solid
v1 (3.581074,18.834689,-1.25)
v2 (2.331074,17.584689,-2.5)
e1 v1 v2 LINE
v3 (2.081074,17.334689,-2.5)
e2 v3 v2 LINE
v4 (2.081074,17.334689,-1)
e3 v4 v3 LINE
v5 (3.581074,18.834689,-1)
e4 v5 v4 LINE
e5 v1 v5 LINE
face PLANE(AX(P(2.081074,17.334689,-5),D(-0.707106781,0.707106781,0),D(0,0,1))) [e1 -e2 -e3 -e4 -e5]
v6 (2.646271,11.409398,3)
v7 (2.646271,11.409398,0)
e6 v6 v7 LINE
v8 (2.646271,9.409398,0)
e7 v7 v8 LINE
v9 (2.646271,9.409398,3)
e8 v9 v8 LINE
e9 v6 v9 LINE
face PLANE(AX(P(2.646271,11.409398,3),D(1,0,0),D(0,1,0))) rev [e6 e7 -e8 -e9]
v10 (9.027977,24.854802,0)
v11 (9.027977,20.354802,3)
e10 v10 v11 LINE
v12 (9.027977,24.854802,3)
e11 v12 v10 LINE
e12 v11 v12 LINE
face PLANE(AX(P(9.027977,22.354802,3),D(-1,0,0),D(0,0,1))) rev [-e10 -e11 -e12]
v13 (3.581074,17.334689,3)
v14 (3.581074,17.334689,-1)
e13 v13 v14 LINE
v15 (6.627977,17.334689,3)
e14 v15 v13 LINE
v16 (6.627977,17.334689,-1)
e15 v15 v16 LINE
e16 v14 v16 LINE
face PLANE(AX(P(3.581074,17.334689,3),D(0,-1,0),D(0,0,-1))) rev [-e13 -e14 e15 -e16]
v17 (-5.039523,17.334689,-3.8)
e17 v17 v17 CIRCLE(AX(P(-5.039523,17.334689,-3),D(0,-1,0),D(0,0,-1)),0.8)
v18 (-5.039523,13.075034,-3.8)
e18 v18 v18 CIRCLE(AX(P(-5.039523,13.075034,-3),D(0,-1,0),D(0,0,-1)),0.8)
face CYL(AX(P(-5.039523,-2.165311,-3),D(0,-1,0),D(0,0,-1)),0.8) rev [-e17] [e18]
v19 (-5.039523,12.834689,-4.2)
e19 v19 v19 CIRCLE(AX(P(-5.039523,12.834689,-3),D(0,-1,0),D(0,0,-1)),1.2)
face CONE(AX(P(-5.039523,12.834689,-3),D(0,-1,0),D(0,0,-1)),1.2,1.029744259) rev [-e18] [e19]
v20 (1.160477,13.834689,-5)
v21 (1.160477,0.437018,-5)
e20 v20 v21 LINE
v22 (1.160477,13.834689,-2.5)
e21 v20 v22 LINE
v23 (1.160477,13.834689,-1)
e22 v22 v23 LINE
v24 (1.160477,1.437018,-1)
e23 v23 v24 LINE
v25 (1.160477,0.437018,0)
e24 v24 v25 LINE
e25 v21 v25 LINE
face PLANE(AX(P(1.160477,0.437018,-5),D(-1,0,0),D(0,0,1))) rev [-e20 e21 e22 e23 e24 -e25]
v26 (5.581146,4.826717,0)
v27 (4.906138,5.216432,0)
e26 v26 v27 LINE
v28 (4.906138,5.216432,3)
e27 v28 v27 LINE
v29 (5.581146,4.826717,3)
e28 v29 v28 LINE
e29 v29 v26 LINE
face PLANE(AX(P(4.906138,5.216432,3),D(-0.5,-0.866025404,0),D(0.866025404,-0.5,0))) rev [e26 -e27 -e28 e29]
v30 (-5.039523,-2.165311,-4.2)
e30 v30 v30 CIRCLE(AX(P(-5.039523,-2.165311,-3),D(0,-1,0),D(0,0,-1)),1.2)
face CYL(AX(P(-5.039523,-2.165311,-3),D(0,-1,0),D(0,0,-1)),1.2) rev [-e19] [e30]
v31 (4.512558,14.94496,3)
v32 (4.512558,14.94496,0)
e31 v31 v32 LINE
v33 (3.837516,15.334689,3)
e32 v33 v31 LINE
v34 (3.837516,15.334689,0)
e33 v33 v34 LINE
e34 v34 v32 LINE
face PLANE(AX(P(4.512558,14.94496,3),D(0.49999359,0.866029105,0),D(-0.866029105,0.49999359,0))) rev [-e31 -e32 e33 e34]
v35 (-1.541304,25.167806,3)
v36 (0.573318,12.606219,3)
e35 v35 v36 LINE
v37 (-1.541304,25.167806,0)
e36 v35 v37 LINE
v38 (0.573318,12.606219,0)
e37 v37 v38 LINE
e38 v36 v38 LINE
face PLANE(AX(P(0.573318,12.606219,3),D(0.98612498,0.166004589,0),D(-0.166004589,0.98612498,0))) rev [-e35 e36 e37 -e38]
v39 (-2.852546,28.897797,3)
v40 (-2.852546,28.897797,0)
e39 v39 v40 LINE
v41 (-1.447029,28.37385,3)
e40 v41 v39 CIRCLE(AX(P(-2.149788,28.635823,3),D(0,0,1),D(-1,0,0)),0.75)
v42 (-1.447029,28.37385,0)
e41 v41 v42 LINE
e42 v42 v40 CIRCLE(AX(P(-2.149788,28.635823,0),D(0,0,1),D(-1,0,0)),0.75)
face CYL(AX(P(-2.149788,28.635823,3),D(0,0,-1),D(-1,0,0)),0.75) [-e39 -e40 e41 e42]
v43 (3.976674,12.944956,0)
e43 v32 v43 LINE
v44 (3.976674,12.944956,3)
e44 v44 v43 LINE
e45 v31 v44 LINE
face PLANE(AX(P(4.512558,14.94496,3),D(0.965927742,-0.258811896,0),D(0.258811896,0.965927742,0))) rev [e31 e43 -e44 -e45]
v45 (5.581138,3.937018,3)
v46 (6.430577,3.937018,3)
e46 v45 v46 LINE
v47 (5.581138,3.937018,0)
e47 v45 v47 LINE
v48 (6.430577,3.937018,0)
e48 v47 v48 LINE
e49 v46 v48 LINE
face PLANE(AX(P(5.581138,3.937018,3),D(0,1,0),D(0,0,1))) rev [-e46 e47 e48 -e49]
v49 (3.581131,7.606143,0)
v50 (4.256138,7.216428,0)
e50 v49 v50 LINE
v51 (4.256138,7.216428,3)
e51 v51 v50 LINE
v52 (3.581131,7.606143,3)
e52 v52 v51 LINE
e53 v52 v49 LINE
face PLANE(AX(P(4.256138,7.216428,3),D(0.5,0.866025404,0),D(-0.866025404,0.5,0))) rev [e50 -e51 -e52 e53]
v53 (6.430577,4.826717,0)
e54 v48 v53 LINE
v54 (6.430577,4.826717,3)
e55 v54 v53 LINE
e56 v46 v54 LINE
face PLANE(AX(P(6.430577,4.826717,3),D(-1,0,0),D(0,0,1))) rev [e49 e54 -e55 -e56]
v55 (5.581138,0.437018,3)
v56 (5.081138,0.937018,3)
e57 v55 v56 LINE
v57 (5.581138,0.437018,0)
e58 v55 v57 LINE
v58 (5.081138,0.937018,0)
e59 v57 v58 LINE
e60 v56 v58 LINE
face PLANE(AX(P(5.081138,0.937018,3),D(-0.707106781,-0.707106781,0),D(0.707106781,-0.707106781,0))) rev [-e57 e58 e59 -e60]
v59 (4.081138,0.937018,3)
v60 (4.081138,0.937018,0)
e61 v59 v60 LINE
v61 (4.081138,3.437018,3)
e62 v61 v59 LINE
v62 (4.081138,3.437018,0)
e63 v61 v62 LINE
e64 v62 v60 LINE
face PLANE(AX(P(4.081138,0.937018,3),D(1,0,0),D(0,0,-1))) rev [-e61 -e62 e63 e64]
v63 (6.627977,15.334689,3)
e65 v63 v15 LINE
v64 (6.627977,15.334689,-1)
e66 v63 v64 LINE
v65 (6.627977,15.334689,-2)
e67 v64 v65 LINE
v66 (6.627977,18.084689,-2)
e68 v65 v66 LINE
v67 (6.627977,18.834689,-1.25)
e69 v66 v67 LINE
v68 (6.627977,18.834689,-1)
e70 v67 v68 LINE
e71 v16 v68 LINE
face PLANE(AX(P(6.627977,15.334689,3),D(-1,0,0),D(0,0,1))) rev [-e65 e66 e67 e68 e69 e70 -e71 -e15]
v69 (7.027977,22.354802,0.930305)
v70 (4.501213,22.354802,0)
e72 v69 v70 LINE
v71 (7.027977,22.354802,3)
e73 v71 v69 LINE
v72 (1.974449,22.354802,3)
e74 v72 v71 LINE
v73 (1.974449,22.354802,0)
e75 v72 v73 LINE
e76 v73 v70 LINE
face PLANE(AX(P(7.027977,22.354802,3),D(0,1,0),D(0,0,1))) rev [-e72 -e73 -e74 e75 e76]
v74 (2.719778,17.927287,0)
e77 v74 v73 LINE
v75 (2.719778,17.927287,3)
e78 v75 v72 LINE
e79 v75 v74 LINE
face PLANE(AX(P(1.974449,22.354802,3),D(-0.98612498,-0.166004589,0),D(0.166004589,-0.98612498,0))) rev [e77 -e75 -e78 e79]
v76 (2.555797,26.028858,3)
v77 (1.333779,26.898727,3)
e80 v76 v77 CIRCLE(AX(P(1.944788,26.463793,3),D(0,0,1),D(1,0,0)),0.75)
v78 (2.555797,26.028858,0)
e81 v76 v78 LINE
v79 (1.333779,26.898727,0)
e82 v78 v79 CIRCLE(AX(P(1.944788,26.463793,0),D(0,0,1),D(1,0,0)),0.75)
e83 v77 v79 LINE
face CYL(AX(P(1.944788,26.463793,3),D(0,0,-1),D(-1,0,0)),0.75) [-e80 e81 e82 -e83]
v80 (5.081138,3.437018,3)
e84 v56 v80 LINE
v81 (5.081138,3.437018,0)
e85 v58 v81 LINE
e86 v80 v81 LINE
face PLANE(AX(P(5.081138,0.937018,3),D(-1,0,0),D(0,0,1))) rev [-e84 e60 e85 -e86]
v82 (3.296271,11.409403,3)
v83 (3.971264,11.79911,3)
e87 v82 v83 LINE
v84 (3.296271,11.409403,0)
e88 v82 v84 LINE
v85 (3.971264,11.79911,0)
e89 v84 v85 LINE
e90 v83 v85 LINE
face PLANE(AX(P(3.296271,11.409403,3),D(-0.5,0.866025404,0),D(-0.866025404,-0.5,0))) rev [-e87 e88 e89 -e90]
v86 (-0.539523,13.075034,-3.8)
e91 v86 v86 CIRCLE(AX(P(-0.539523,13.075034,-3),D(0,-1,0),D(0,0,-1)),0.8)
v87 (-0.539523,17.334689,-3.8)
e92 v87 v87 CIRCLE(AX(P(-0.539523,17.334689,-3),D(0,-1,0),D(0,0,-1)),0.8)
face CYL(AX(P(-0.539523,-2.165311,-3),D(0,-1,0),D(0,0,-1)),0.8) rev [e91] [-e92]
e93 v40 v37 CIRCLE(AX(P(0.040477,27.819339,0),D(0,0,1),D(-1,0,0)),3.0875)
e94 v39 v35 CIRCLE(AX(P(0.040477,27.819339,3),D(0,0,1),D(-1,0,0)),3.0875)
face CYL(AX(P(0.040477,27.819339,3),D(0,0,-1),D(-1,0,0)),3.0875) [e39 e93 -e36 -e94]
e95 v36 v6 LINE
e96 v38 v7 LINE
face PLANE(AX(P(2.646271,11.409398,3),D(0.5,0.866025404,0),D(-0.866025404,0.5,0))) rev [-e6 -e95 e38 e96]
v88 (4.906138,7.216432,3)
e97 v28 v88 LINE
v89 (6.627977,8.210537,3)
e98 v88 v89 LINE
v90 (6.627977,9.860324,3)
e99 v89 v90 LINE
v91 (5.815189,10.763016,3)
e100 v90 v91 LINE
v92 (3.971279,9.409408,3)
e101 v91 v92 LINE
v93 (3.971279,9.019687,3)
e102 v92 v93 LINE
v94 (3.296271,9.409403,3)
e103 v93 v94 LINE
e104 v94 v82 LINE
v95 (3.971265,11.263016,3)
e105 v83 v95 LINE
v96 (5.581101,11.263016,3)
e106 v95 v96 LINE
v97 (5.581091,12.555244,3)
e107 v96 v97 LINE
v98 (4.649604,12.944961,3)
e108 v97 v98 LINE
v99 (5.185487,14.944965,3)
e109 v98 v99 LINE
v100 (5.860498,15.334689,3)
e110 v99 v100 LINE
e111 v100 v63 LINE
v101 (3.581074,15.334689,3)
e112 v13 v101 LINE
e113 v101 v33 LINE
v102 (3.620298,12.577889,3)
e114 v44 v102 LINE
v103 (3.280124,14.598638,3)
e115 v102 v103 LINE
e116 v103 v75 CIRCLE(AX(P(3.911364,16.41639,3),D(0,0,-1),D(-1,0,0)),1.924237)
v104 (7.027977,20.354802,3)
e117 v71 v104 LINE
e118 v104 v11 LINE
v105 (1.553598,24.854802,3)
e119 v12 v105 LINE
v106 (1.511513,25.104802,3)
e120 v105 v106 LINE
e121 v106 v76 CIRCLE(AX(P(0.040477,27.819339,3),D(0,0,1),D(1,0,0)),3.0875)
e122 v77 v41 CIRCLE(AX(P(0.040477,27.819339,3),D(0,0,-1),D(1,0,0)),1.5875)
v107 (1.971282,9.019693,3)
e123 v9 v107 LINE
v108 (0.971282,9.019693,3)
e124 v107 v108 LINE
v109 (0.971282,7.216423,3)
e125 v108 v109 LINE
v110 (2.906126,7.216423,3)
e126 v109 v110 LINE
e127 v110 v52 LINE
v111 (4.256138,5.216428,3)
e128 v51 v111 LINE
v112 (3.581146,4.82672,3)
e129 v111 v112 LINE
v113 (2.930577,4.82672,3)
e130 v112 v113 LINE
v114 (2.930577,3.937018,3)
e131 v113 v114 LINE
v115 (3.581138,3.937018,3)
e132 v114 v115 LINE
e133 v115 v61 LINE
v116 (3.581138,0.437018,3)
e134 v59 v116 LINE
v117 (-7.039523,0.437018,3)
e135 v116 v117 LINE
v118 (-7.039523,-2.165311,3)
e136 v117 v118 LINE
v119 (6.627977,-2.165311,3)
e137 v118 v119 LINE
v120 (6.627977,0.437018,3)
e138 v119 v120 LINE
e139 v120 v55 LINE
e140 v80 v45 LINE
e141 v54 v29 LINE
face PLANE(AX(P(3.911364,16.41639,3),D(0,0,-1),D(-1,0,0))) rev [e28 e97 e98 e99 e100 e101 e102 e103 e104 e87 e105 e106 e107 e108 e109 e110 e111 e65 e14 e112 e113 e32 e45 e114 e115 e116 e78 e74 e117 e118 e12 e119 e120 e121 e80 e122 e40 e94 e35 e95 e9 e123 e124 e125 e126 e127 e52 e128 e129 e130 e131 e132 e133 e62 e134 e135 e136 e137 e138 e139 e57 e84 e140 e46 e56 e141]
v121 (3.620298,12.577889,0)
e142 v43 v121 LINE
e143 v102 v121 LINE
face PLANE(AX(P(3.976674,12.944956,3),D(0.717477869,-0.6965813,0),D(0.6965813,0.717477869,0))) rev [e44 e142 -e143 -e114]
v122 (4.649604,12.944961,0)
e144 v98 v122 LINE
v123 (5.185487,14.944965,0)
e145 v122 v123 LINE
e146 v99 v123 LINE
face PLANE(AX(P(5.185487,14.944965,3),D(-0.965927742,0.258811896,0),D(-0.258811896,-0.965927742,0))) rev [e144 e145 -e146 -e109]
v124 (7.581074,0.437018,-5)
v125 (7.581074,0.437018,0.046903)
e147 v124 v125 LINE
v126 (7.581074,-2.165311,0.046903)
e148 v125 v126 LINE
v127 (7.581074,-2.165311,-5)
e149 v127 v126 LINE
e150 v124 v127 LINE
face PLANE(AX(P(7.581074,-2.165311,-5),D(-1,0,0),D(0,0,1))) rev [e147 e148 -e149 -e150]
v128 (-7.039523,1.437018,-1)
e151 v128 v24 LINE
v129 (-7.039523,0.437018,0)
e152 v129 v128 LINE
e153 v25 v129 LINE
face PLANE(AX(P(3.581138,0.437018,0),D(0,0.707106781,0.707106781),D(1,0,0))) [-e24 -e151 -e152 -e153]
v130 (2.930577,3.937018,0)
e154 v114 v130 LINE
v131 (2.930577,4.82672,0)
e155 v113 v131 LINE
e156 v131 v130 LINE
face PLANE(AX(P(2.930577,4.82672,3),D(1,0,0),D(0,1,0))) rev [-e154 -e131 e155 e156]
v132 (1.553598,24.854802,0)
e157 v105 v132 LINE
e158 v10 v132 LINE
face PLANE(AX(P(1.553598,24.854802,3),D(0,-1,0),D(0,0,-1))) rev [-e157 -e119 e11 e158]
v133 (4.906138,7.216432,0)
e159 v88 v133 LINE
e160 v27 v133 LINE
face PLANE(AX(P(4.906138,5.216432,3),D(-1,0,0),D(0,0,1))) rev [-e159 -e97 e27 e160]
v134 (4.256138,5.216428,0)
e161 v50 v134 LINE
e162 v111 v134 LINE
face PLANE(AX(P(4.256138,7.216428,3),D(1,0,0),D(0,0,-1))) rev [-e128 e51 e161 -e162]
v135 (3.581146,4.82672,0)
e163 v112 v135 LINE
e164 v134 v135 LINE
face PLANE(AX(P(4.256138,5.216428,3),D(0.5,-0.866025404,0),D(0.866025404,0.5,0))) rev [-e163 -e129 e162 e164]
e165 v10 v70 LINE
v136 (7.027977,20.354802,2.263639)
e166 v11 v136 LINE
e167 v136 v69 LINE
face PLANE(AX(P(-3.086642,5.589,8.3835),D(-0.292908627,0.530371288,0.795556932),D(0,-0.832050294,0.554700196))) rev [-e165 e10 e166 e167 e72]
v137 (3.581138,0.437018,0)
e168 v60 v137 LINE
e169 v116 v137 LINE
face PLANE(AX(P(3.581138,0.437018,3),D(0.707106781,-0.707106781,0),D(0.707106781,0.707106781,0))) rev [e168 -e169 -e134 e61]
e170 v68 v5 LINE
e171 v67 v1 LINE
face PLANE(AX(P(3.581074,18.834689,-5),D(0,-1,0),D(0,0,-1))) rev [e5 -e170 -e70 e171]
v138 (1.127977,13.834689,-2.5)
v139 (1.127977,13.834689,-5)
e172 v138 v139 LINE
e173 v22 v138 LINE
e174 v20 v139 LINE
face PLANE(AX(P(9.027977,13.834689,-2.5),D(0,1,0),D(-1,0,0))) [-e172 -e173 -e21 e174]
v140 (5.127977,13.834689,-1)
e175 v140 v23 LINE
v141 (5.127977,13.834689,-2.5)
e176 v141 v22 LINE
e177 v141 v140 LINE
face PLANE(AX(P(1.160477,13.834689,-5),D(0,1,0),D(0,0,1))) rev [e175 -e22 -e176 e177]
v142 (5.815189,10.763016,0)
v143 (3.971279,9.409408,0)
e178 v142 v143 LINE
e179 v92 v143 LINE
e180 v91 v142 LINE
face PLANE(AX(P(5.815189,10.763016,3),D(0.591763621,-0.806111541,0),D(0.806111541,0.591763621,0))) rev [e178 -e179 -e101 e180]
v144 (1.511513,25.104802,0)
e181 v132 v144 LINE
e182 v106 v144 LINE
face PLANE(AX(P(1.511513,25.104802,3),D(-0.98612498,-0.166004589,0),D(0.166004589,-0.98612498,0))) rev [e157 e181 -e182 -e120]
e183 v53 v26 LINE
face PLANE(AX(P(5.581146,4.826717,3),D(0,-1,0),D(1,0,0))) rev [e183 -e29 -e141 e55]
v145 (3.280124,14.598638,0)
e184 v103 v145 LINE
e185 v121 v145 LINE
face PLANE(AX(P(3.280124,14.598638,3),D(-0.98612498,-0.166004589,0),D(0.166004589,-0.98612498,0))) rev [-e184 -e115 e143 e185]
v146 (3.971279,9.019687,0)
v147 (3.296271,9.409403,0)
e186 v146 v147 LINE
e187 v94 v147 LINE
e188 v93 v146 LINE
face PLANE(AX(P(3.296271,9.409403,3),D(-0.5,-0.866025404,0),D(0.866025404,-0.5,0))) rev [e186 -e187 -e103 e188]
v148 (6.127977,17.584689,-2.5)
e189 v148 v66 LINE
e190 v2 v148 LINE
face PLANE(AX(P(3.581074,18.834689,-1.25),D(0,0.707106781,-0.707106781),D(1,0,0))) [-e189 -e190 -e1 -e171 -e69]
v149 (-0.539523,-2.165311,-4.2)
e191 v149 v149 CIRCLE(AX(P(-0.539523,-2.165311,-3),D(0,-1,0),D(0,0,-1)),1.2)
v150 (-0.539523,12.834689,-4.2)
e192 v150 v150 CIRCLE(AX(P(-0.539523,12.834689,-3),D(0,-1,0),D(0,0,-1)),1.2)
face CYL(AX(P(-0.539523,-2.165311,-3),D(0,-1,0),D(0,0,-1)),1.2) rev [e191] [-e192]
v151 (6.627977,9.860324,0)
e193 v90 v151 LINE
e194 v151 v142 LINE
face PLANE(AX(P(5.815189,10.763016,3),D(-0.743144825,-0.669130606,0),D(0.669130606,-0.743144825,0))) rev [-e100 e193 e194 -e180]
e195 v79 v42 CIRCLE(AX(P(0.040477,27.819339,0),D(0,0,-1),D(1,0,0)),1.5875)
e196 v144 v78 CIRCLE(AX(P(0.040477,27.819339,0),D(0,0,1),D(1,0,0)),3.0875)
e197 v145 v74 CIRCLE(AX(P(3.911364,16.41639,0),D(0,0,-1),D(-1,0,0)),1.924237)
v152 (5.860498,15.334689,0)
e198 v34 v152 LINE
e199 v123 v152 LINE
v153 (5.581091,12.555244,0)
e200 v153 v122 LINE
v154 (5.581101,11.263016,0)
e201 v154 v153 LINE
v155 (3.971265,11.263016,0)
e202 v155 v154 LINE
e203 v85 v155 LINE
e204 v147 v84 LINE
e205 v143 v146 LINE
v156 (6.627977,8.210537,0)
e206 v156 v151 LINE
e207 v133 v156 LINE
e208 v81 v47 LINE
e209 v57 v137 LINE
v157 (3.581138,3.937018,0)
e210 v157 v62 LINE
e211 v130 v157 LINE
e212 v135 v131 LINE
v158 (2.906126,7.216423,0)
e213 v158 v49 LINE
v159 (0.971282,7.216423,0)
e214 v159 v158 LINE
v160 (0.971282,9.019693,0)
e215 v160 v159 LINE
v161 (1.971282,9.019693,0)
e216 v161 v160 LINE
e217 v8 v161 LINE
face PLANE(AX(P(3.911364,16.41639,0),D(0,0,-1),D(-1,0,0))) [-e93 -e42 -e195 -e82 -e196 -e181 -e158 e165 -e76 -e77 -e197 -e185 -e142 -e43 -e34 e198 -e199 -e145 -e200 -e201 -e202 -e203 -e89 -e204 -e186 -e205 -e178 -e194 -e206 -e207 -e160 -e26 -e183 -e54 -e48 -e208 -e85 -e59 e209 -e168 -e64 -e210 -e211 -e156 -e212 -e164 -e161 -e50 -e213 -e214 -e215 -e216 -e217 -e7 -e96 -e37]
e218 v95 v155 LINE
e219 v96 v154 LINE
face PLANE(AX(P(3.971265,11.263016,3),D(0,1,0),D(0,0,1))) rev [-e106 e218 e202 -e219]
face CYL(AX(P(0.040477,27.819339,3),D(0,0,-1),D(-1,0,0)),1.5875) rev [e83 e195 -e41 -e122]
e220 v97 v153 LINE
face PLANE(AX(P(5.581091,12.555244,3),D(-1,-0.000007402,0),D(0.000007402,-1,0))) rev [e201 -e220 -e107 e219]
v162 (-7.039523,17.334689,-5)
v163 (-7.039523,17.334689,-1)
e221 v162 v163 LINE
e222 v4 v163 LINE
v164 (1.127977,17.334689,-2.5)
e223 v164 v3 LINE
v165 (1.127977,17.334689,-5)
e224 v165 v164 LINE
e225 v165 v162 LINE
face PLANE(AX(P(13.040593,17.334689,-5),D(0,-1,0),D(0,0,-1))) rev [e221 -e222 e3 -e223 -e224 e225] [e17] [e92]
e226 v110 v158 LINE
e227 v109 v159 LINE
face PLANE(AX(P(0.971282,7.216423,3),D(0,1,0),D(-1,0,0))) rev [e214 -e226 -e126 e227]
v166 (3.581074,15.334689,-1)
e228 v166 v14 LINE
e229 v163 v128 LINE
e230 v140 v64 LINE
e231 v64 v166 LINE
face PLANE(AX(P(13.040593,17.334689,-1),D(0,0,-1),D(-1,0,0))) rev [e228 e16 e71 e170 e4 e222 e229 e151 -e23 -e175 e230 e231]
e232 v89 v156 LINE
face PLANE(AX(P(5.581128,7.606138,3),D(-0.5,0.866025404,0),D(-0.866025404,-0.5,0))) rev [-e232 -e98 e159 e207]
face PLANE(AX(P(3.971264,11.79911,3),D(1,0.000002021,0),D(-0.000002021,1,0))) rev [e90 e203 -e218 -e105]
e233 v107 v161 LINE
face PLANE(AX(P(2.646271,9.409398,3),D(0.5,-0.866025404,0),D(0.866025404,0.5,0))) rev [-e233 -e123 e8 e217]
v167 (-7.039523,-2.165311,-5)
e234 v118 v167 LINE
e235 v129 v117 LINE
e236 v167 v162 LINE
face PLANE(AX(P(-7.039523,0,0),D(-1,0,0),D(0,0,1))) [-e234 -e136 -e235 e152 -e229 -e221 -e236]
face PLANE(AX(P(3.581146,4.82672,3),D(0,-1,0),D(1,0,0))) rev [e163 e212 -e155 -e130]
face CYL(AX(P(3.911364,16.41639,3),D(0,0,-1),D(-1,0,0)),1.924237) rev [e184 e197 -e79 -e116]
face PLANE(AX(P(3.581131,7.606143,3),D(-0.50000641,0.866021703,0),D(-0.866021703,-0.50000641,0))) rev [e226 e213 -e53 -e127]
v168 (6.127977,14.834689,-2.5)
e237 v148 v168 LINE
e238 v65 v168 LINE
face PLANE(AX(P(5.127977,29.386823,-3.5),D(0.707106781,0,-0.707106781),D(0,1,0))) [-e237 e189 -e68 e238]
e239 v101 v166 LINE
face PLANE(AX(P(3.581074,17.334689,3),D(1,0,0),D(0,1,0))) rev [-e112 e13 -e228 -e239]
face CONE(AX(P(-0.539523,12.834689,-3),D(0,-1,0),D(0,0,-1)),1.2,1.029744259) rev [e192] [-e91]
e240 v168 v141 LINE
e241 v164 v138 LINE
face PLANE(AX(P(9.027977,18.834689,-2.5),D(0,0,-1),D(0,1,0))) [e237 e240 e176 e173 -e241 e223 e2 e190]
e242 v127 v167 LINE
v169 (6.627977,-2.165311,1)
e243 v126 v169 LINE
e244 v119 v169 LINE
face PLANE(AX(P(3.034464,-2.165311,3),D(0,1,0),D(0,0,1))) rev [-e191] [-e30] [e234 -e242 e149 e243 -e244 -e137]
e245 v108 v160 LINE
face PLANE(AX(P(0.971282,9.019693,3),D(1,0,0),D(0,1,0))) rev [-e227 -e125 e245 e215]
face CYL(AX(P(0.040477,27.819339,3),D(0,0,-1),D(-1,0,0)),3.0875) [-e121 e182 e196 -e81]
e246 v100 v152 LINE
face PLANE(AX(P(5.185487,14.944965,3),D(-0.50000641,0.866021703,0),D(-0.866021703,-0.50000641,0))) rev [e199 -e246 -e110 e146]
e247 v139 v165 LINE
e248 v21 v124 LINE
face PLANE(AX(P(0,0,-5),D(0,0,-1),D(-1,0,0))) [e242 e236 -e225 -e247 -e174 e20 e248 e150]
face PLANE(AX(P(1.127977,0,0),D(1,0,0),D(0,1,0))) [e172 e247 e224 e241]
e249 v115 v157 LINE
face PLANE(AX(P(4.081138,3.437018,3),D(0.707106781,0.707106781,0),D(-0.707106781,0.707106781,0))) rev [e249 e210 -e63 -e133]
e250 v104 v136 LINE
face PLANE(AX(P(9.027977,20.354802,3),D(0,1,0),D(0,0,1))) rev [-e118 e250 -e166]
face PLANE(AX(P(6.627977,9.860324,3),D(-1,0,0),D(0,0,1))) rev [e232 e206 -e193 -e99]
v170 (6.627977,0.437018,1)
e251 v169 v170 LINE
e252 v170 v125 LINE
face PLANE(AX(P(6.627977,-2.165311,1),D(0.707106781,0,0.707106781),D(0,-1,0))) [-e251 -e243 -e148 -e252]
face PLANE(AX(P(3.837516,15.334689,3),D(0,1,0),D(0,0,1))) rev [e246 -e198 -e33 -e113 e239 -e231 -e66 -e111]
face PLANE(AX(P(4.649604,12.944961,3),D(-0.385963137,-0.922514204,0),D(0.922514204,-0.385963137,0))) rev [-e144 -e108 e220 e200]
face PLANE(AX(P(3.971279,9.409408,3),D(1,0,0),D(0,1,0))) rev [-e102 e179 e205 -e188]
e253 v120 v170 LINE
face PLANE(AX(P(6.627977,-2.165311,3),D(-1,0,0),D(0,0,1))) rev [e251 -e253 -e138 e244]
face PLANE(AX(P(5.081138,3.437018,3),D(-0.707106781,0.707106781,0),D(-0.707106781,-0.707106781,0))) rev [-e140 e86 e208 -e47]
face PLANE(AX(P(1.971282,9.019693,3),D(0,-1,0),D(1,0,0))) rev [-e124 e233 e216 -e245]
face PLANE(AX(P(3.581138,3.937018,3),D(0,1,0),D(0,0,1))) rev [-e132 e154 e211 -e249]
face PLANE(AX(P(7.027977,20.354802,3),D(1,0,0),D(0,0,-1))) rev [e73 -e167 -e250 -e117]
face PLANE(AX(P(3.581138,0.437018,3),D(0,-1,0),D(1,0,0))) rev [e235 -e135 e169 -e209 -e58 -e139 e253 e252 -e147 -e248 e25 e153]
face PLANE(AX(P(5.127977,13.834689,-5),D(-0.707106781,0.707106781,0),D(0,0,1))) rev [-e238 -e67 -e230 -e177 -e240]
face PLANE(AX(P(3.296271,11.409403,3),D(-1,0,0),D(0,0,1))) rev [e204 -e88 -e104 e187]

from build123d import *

# Parameters (mm, degrees)
BOSS_SWITCH_BODY_DEPTH                    = 3
SKETCH1_W                                 = 4
SKETCH1_H                                 = 3.5
BOSS_FLANGE_WIDTH_DEPTH                   = 5
BOSS_FLANGE_HEIGHT_REACH                  = 35.863
SKETCH2_W                                 = 4
SKETCH2_H                                 = 2
SKETCH2_W_2                               = 8
SKETCH2_H_2                               = 2.602328973
CUT_UP_TO_DOWN_DERAILLEUR_CLEARANCE_REACH = 22.316
SKETCH10_W                                = 2.453096586
SKETCH10_H                                = 3
SKETCH17_W                                = 12.1675
SKETCH17_H                                = 4
BOSS_FLANGE_SUPPORT_DEPTH                 = 14.897671027
TAP_DRILL_FOR_M2X0_4_TAP1_D               = 1.6
M2_CLEARANCE_HOLE2_D                      = 2.4
M2_CLEARANCE_HOLE2_DEPTH                  = 15
M2_CLEARANCE_HOLE2_TIP                    = 0.721032743
CHAMFER_FLANGE_SUPPORT_SIZE               = 1.5
CHAMFER_FLANGE_SUPPORT_2_SIZE             = 1.5
SKETCH23_W                                = 3.9675
SKETCH23_H                                = 13.397671027
CUT_GAP_FOR_PRINTING_DEPTH                = 32.000499688
CHAMFER_FLANGE_SUPPORT_3_SIZE             = 1
SKETCH25_W                                = 0.953096586
SKETCH25_H                                = 3.5
CUT_DERAILLEUR_CLEARANCE_DEPTH            = 32.145320369
CHAMFER8_SIZE                             = 1
CUT_UP_TO_DOWN_CANTILEVER_SLOPE_REACH     = 31.869
SKETCH26_W                                = 12.477246204
SKETCH26_H                                = 5.771077126
CUT_WIDE_DERAILLEUR_CLEARANCE_DEPTH       = 33.195879702
CUT_WIDE_DERAILLEUR_CLEARANCE_DEPTH_BACK  = 4
SKETCH27_W                                = 2.5
SKETCH27_H                                = 5.000000046
CHAMFER9_SIZE                             = 1.25
SKETCH28_W                                = 3.046903414
SKETCH28_H                                = 1.5
CUT_EXTRUDE1_DEPTH                        = 1


# Some blends are built 0.0001 mm under size
with BuildPart() as part:
    # Sketch-SwitchBossUp → Boss-Switch Body (new body)
    with BuildSketch(Plane.XY):
        with BuildLine():
            Line((5.581091201, 12.55524379), (5.581100766, 11.263016279))
            Line((5.581100766, 11.263016279), (3.971265023, 11.263016279))
            Line((3.971265023, 11.263016279), (3.97126394, 11.79911022))
            Line((3.97126394, 11.79911022), (3.296271341, 11.409403061))
            Line((3.296271341, 11.409403061), (3.296271341, 9.409403061))
            Line((3.296271341, 9.409403061), (3.971278743, 9.019687356))
            Line((3.971278743, 9.019687356), (3.971278743, 9.409408058))
            Line((3.971278743, 9.409408058), (5.815189336, 10.763016279))
            Line((5.815189336, 10.763016279), (6.627976927, 9.860324207))
            Line((6.627976927, 9.860324207), (6.627976927, 8.210536505))
            Line((6.627976927, 8.210536505), (5.581127833, 7.606137899))
            Line((5.581127833, 7.606137899), (4.906138119, 7.216432406))
            Line((4.906138119, 7.216432406), (4.906138119, 5.216432406))
            Line((4.906138119, 5.216432406), (5.58114552, 4.826716701))
            Line((5.58114552, 4.826716701), (6.430577026, 4.826716701))
            Line((6.430577026, 4.826716701), (6.430577026, 3.937018274))
            Line((6.430577026, 3.937018274), (5.581138119, 3.937018274))
            Line((5.581138119, 3.937018274), (5.081138119, 3.437018274))
            Line((5.081138119, 3.437018274), (5.081138119, 0.937018274))
            Line((5.081138119, 0.937018274), (5.581138119, 0.437018274))
            Line((5.581138119, 0.437018274), (6.627976927, 0.437018274))
            Line((6.627976927, 0.437018274), (6.627976927, -2.165310699))
            Line((6.627976927, -2.165310699), (3.034464198, -2.165310699))
            Line((3.034464198, -2.165310699), (3.034464198, 0.437018274))
            Line((3.034464198, 0.437018274), (3.581138119, 0.437018274))
            Line((3.581138119, 0.437018274), (4.081138119, 0.937018274))
            Line((4.081138119, 0.937018274), (4.081138119, 3.437018274))
            Line((4.081138119, 3.437018274), (3.581138119, 3.937018274))
            Line((3.581138119, 3.937018274), (2.930577026, 3.937018274))
            Line((2.930577026, 3.937018274), (2.930577026, 4.826720436))
            Line((2.930577026, 4.826720436), (3.58114552, 4.826720436))
            Line((3.58114552, 4.826720436), (4.256138119, 5.216427595))
            Line((4.256138119, 5.216427595), (4.256138119, 7.216427595))
            Line((4.256138119, 7.216427595), (3.581130717, 7.6061433))
            Line((3.581130717, 7.6061433), (2.9061262, 7.216422599))
            Line((2.9061262, 7.216422599), (0.971281627, 7.216422599))
            Line((0.971281627, 7.216422599), (0.971281627, 9.019692757))
            Line((0.971281627, 9.019692757), (1.971281627, 9.019692757))
            Line((1.971281627, 9.019692757), (2.646271341, 9.40939825))
            Line((2.646271341, 9.40939825), (2.646271341, 11.40939825))
            Line((2.646271341, 11.40939825), (1.696557212, 11.957715958))
            Line((1.696557212, 11.957715958), (0.573317845, 12.60621851))
            Line((0.573317845, 12.60621851), (-1.541303694, 25.167805745))
            ThreePointArc((-1.541303694, 25.167805745), (-2.872284003, 26.795385437), (-2.852546321, 28.897797067))
            ThreePointArc((-2.852546321, 28.897797067), (-1.887813913, 29.338582026), (-1.447028953, 28.373849618))
            ThreePointArc((-1.447028953, 28.373849618), (-0.703448682, 26.416936722), (1.333779254, 26.898727173))
            ThreePointArc((1.333779254, 26.898727173), (2.379722745, 27.074801628), (2.555797201, 26.028858137))
            ThreePointArc((2.555797201, 26.028858137), (2.086504637, 25.507104397), (1.511513111, 25.104801997))
            Line((1.511513111, 25.104801997), (1.553598189, 24.854801997))
            Line((1.553598189, 24.854801997), (9.027976927, 24.854801997))
            Line((9.027976927, 24.854801997), (9.027976927, 22.354801997))
            Line((9.027976927, 22.354801997), (9.027976927, 20.354801997))
            Line((9.027976927, 20.354801997), (7.027976927, 20.354801997))
            Line((7.027976927, 20.354801997), (7.027976927, 22.354801997))
            Line((7.027976927, 22.354801997), (1.974448974, 22.354801997))
            Line((1.974448974, 22.354801997), (2.719778232, 17.927287042))
            ThreePointArc((2.719778232, 17.927287042), (2.013826204, 16.096957693), (3.280124137, 14.598637521))
            Line((3.280124137, 14.598637521), (3.620297651, 12.577888564))
            Line((3.620297651, 12.577888564), (3.976674365, 12.944956135))
            Line((3.976674365, 12.944956135), (4.512557947, 14.944960101))
            Line((4.512557947, 14.944960101), (3.837515632, 15.334689301))
            Line((3.837515632, 15.334689301), (3.581073513, 15.334689301))
            Line((3.581073513, 15.334689301), (3.581073513, 17.334689301))
            Line((3.581073513, 17.334689301), (5.725580434, 17.334689301))
            Line((5.725580434, 17.334689301), (6.627976927, 17.334689301))
            Line((6.627976927, 17.334689301), (6.627976927, 15.334689301))
            Line((6.627976927, 15.334689301), (5.860498075, 15.334689301))
            Line((5.860498075, 15.334689301), (5.185487464, 14.944965082))
            Line((5.185487464, 14.944965082), (4.649603883, 12.944961115))
            Line((4.649603883, 12.944961115), (5.581091201, 12.55524379))
        make_face()
    extrude(amount=BOSS_SWITCH_BODY_DEPTH)

    # Sketch1 → Boss-Flange Width (add)
    with BuildSketch(Plane(origin=(0, 0, 0), x_dir=(-1, 0, 0), z_dir=(0, 0, -1))):
        Polygon((-7.581073513, -2.165310699), (0.412170615, -2.165310699), (0.412170615, 0.437018274), (-3.034464198, 0.437018274), (-3.581138119, 0.437018274), (-5.081138119, 0.437018274), (-6.627976927, 0.437018274), (-7.581073513, 0.437018274), align=None)
        with Locations((-5.581073513, 17.084689301)):
            Rectangle(SKETCH1_W, SKETCH1_H)
    extrude(amount=BOSS_FLANGE_WIDTH_DEPTH)

    # Sketch2 → Boss-Flange Height (add, up to next)
    with BuildSketch(Plane(origin=(-7.039523073, 0, 0), x_dir=(0, 0, -1), z_dir=(1, 0, 0)), mode=Mode.PRIVATE) as boss_flange_height_sk1:
        with Locations((3, 16.334689301)):
            Rectangle(SKETCH2_W, SKETCH2_H)
    boss_flange_height_tool1 = extrude(boss_flange_height_sk1.sketch, amount=BOSS_FLANGE_HEIGHT_REACH, mode=Mode.PRIVATE) - part.part
    # Sketch2 → Boss-Flange Height (add, up to next)
    with BuildSketch(Plane(origin=(-7.039523073, 0, 0), x_dir=(0, 0, -1), z_dir=(1, 0, 0)), mode=Mode.PRIVATE) as boss_flange_height_sk2:
        with Locations((1, -0.864146212)):
            Rectangle(SKETCH2_W_2, SKETCH2_H_2)
    boss_flange_height_tool2 = extrude(boss_flange_height_sk2.sketch, amount=BOSS_FLANGE_HEIGHT_REACH, mode=Mode.PRIVATE) - part.part
    add(boss_flange_height_tool1.solids().sort_by_distance((-7.039523, 16.334689, -3))[0])
    add(boss_flange_height_tool2.solids().sort_by_distance((-7.039523, -0.864146, -1))[0])

    # Sketch10 → Cut-Up-To-Down Derailleur Clearance (cut, up to next)
    with BuildSketch(Plane(origin=(0, 15.334689301, 0), x_dir=(1, 0, 0), z_dir=(0, 1, 0)), mode=Mode.PRIVATE) as cut_up_to_down_derailleur_clearance_sk1:
        with Locations((6.35452522, 3.5)):
            Rectangle(SKETCH10_W, SKETCH10_H)
    cut_up_to_down_derailleur_clearance_tool1 = extrude(cut_up_to_down_derailleur_clearance_sk1.sketch, amount=CUT_UP_TO_DOWN_DERAILLEUR_CLEARANCE_REACH, mode=Mode.PRIVATE) & part.part
    add(cut_up_to_down_derailleur_clearance_tool1.solids().sort_by_distance((6.354525, 15.334689, -3.5))[0], mode=Mode.SUBTRACT)

    # Sketch17 → Boss-Flange Support (add)
    with BuildSketch(Plane.XZ.offset(-15.334689301)):
        with Locations((-0.955773073, -3)):
            Rectangle(SKETCH17_W, SKETCH17_H)
    extrude(amount=BOSS_FLANGE_SUPPORT_DEPTH)

    # Tap Drill for M2x0.4 Tap1 (through all)
    with Locations(Plane(origin=(0, -2.165310699, 0), x_dir=(-1, 0, 0), z_dir=(0, -1, 0))):
        with Locations((5.039523073, 3), (0.539523073, 3)):
            Hole(TAP_DRILL_FOR_M2X0_4_TAP1_D / 2)

    # M2 Clearance Hole2
    with Locations(Plane.XZ.offset(2.165310699)):
        with Locations((-5.039523073, -3), (-0.539523073, -3)):
            Hole(M2_CLEARANCE_HOLE2_D / 2, depth=M2_CLEARANCE_HOLE2_DEPTH)
            with Locations((0, 0, -(M2_CLEARANCE_HOLE2_DEPTH + M2_CLEARANCE_HOLE2_TIP / 2))):  # 118° drill point
                Cone(0, M2_CLEARANCE_HOLE2_D / 2, M2_CLEARANCE_HOLE2_TIP, mode=Mode.SUBTRACT)

    # Chamfer-Flange Support
    chamfer_flange_support_edges = [part.edges().sort_by_distance(p)[0] for p in [
        (3.581073513, 17.334689301, -3),
    ]]
    chamfer(chamfer_flange_support_edges, length=CHAMFER_FLANGE_SUPPORT_SIZE - 0.0001)  # a hair under: the kernel refuses the full size

    # Chamfer-Flange Support 2
    chamfer_flange_support_2_edges = [part.edges().sort_by_distance(p)[0] for p in [
        (5.127976927, 17.084689301, -2),
        (5.127976927, 15.334689301, -1.5),
    ]]
    chamfer(chamfer_flange_support_2_edges, length=CHAMFER_FLANGE_SUPPORT_2_SIZE)

    # Sketch23 → Cut-Gap for Printing (cut, through all)
    with BuildSketch(Plane.XY.offset(-1)):
        with Locations((3.144226927, 7.135853788)):
            Rectangle(SKETCH23_W, SKETCH23_H)
    extrude(amount=-CUT_GAP_FOR_PRINTING_DEPTH, mode=Mode.SUBTRACT)

    # Chamfer-Flange Support 3
    chamfer_flange_support_3_edges = [part.edges().sort_by_distance(p)[0] for p in [
        (-2.939523073, 0.437018274, -1),
    ]]
    chamfer(chamfer_flange_support_3_edges, length=CHAMFER_FLANGE_SUPPORT_3_SIZE)

    # Sketch25 → Cut-Derailleur Clearance (cut, through all)
    with BuildSketch(Plane.XY):
        with Locations((7.10452522, 17.084689301)):
            Rectangle(SKETCH25_W, SKETCH25_H)
    extrude(amount=-CUT_DERAILLEUR_CLEARANCE_DEPTH, mode=Mode.SUBTRACT)

    # Chamfer8
    # the kernel refuses this chamfer: 1 mm, written as the material it adds along each edge
    with BuildSketch(Plane(origin=(6.627976927, 0.437018274, 0), x_dir=(0.9996219169112968, 0, -0.027495876610586365), z_dir=(0, -1, 0))) as chamfer8_piece_1_section:
        Polygon((CHAMFER8_SIZE * 0.999621916911, CHAMFER8_SIZE * 0.0274958766106), (-CHAMFER8_SIZE * 0.0274958766106, CHAMFER8_SIZE * 0.999621916911), (0, 0), align=None)
    chamfer8_piece_1 = extrude(amount=2.602328973, mode=Mode.PRIVATE)
    chamfer8_piece_1 = split(chamfer8_piece_1, bisect_by=Plane(origin=(7.581073513, -0.864146212, 0.332375145), z_dir=(-1, 0, 0)), keep=Keep.TOP, mode=Mode.PRIVATE)
    add(chamfer8_piece_1)

    # Sketch26 → Cut-Up-to-Down Cantilever Slope (cut, up to next)
    with BuildSketch(Plane(origin=(-3.086642121, 5.589000146, 8.383500218), x_dir=(-0.9561404375276108, -0.1624764728289173, -0.24371470924337582), z_dir=(0.2929086269205964, -0.5303712883154423, -0.795556932473163)), mode=Mode.PRIVATE) as cut_up_to_down_cantilever_slope_sk1:
        with Locations((-13.791615152, 17.794906754)):
            Rectangle(SKETCH26_W, SKETCH26_H)
    cut_up_to_down_cantilever_slope_tool1 = extrude(cut_up_to_down_cantilever_slope_sk1.sketch, amount=CUT_UP_TO_DOWN_CANTILEVER_SLOPE_REACH, mode=Mode.PRIVATE) & part.part
    add(cut_up_to_down_cantilever_slope_tool1.solids().sort_by_distance((10.100079, 22.636071, 1.873881))[0], mode=Mode.SUBTRACT)

    # Sketch27 → Cut-Wide Derailleur Clearance (cut, two sides: drawn at the far end of the back side and taken through both)
    with BuildSketch(Plane(origin=(5.127976927, 0, 0), x_dir=(0, 0, -1), z_dir=(1, 0, 0)).offset(-CUT_WIDE_DERAILLEUR_CLEARANCE_DEPTH_BACK)):
        with Locations((3.75, 16.334689324)):
            Rectangle(SKETCH27_W, SKETCH27_H)
    extrude(amount=CUT_WIDE_DERAILLEUR_CLEARANCE_DEPTH + CUT_WIDE_DERAILLEUR_CLEARANCE_DEPTH_BACK, mode=Mode.SUBTRACT)

    # Chamfer9
    chamfer9_edges = [part.edges().sort_by_distance(p)[0] for p in [
        (4.85452522, 18.834689347, -2.5),
    ]]
    chamfer(chamfer9_edges, length=CHAMFER9_SIZE)

    # Sketch28 → Cut-Extrude1 (cut)
    with BuildSketch(Plane.XY.offset(-1)):
        with Locations((5.10452522, 18.084689301)):
            Rectangle(SKETCH28_W, SKETCH28_H)
    extrude(amount=CUT_EXTRUDE1_DEPTH, mode=Mode.SUBTRACT)


solid = part.part
